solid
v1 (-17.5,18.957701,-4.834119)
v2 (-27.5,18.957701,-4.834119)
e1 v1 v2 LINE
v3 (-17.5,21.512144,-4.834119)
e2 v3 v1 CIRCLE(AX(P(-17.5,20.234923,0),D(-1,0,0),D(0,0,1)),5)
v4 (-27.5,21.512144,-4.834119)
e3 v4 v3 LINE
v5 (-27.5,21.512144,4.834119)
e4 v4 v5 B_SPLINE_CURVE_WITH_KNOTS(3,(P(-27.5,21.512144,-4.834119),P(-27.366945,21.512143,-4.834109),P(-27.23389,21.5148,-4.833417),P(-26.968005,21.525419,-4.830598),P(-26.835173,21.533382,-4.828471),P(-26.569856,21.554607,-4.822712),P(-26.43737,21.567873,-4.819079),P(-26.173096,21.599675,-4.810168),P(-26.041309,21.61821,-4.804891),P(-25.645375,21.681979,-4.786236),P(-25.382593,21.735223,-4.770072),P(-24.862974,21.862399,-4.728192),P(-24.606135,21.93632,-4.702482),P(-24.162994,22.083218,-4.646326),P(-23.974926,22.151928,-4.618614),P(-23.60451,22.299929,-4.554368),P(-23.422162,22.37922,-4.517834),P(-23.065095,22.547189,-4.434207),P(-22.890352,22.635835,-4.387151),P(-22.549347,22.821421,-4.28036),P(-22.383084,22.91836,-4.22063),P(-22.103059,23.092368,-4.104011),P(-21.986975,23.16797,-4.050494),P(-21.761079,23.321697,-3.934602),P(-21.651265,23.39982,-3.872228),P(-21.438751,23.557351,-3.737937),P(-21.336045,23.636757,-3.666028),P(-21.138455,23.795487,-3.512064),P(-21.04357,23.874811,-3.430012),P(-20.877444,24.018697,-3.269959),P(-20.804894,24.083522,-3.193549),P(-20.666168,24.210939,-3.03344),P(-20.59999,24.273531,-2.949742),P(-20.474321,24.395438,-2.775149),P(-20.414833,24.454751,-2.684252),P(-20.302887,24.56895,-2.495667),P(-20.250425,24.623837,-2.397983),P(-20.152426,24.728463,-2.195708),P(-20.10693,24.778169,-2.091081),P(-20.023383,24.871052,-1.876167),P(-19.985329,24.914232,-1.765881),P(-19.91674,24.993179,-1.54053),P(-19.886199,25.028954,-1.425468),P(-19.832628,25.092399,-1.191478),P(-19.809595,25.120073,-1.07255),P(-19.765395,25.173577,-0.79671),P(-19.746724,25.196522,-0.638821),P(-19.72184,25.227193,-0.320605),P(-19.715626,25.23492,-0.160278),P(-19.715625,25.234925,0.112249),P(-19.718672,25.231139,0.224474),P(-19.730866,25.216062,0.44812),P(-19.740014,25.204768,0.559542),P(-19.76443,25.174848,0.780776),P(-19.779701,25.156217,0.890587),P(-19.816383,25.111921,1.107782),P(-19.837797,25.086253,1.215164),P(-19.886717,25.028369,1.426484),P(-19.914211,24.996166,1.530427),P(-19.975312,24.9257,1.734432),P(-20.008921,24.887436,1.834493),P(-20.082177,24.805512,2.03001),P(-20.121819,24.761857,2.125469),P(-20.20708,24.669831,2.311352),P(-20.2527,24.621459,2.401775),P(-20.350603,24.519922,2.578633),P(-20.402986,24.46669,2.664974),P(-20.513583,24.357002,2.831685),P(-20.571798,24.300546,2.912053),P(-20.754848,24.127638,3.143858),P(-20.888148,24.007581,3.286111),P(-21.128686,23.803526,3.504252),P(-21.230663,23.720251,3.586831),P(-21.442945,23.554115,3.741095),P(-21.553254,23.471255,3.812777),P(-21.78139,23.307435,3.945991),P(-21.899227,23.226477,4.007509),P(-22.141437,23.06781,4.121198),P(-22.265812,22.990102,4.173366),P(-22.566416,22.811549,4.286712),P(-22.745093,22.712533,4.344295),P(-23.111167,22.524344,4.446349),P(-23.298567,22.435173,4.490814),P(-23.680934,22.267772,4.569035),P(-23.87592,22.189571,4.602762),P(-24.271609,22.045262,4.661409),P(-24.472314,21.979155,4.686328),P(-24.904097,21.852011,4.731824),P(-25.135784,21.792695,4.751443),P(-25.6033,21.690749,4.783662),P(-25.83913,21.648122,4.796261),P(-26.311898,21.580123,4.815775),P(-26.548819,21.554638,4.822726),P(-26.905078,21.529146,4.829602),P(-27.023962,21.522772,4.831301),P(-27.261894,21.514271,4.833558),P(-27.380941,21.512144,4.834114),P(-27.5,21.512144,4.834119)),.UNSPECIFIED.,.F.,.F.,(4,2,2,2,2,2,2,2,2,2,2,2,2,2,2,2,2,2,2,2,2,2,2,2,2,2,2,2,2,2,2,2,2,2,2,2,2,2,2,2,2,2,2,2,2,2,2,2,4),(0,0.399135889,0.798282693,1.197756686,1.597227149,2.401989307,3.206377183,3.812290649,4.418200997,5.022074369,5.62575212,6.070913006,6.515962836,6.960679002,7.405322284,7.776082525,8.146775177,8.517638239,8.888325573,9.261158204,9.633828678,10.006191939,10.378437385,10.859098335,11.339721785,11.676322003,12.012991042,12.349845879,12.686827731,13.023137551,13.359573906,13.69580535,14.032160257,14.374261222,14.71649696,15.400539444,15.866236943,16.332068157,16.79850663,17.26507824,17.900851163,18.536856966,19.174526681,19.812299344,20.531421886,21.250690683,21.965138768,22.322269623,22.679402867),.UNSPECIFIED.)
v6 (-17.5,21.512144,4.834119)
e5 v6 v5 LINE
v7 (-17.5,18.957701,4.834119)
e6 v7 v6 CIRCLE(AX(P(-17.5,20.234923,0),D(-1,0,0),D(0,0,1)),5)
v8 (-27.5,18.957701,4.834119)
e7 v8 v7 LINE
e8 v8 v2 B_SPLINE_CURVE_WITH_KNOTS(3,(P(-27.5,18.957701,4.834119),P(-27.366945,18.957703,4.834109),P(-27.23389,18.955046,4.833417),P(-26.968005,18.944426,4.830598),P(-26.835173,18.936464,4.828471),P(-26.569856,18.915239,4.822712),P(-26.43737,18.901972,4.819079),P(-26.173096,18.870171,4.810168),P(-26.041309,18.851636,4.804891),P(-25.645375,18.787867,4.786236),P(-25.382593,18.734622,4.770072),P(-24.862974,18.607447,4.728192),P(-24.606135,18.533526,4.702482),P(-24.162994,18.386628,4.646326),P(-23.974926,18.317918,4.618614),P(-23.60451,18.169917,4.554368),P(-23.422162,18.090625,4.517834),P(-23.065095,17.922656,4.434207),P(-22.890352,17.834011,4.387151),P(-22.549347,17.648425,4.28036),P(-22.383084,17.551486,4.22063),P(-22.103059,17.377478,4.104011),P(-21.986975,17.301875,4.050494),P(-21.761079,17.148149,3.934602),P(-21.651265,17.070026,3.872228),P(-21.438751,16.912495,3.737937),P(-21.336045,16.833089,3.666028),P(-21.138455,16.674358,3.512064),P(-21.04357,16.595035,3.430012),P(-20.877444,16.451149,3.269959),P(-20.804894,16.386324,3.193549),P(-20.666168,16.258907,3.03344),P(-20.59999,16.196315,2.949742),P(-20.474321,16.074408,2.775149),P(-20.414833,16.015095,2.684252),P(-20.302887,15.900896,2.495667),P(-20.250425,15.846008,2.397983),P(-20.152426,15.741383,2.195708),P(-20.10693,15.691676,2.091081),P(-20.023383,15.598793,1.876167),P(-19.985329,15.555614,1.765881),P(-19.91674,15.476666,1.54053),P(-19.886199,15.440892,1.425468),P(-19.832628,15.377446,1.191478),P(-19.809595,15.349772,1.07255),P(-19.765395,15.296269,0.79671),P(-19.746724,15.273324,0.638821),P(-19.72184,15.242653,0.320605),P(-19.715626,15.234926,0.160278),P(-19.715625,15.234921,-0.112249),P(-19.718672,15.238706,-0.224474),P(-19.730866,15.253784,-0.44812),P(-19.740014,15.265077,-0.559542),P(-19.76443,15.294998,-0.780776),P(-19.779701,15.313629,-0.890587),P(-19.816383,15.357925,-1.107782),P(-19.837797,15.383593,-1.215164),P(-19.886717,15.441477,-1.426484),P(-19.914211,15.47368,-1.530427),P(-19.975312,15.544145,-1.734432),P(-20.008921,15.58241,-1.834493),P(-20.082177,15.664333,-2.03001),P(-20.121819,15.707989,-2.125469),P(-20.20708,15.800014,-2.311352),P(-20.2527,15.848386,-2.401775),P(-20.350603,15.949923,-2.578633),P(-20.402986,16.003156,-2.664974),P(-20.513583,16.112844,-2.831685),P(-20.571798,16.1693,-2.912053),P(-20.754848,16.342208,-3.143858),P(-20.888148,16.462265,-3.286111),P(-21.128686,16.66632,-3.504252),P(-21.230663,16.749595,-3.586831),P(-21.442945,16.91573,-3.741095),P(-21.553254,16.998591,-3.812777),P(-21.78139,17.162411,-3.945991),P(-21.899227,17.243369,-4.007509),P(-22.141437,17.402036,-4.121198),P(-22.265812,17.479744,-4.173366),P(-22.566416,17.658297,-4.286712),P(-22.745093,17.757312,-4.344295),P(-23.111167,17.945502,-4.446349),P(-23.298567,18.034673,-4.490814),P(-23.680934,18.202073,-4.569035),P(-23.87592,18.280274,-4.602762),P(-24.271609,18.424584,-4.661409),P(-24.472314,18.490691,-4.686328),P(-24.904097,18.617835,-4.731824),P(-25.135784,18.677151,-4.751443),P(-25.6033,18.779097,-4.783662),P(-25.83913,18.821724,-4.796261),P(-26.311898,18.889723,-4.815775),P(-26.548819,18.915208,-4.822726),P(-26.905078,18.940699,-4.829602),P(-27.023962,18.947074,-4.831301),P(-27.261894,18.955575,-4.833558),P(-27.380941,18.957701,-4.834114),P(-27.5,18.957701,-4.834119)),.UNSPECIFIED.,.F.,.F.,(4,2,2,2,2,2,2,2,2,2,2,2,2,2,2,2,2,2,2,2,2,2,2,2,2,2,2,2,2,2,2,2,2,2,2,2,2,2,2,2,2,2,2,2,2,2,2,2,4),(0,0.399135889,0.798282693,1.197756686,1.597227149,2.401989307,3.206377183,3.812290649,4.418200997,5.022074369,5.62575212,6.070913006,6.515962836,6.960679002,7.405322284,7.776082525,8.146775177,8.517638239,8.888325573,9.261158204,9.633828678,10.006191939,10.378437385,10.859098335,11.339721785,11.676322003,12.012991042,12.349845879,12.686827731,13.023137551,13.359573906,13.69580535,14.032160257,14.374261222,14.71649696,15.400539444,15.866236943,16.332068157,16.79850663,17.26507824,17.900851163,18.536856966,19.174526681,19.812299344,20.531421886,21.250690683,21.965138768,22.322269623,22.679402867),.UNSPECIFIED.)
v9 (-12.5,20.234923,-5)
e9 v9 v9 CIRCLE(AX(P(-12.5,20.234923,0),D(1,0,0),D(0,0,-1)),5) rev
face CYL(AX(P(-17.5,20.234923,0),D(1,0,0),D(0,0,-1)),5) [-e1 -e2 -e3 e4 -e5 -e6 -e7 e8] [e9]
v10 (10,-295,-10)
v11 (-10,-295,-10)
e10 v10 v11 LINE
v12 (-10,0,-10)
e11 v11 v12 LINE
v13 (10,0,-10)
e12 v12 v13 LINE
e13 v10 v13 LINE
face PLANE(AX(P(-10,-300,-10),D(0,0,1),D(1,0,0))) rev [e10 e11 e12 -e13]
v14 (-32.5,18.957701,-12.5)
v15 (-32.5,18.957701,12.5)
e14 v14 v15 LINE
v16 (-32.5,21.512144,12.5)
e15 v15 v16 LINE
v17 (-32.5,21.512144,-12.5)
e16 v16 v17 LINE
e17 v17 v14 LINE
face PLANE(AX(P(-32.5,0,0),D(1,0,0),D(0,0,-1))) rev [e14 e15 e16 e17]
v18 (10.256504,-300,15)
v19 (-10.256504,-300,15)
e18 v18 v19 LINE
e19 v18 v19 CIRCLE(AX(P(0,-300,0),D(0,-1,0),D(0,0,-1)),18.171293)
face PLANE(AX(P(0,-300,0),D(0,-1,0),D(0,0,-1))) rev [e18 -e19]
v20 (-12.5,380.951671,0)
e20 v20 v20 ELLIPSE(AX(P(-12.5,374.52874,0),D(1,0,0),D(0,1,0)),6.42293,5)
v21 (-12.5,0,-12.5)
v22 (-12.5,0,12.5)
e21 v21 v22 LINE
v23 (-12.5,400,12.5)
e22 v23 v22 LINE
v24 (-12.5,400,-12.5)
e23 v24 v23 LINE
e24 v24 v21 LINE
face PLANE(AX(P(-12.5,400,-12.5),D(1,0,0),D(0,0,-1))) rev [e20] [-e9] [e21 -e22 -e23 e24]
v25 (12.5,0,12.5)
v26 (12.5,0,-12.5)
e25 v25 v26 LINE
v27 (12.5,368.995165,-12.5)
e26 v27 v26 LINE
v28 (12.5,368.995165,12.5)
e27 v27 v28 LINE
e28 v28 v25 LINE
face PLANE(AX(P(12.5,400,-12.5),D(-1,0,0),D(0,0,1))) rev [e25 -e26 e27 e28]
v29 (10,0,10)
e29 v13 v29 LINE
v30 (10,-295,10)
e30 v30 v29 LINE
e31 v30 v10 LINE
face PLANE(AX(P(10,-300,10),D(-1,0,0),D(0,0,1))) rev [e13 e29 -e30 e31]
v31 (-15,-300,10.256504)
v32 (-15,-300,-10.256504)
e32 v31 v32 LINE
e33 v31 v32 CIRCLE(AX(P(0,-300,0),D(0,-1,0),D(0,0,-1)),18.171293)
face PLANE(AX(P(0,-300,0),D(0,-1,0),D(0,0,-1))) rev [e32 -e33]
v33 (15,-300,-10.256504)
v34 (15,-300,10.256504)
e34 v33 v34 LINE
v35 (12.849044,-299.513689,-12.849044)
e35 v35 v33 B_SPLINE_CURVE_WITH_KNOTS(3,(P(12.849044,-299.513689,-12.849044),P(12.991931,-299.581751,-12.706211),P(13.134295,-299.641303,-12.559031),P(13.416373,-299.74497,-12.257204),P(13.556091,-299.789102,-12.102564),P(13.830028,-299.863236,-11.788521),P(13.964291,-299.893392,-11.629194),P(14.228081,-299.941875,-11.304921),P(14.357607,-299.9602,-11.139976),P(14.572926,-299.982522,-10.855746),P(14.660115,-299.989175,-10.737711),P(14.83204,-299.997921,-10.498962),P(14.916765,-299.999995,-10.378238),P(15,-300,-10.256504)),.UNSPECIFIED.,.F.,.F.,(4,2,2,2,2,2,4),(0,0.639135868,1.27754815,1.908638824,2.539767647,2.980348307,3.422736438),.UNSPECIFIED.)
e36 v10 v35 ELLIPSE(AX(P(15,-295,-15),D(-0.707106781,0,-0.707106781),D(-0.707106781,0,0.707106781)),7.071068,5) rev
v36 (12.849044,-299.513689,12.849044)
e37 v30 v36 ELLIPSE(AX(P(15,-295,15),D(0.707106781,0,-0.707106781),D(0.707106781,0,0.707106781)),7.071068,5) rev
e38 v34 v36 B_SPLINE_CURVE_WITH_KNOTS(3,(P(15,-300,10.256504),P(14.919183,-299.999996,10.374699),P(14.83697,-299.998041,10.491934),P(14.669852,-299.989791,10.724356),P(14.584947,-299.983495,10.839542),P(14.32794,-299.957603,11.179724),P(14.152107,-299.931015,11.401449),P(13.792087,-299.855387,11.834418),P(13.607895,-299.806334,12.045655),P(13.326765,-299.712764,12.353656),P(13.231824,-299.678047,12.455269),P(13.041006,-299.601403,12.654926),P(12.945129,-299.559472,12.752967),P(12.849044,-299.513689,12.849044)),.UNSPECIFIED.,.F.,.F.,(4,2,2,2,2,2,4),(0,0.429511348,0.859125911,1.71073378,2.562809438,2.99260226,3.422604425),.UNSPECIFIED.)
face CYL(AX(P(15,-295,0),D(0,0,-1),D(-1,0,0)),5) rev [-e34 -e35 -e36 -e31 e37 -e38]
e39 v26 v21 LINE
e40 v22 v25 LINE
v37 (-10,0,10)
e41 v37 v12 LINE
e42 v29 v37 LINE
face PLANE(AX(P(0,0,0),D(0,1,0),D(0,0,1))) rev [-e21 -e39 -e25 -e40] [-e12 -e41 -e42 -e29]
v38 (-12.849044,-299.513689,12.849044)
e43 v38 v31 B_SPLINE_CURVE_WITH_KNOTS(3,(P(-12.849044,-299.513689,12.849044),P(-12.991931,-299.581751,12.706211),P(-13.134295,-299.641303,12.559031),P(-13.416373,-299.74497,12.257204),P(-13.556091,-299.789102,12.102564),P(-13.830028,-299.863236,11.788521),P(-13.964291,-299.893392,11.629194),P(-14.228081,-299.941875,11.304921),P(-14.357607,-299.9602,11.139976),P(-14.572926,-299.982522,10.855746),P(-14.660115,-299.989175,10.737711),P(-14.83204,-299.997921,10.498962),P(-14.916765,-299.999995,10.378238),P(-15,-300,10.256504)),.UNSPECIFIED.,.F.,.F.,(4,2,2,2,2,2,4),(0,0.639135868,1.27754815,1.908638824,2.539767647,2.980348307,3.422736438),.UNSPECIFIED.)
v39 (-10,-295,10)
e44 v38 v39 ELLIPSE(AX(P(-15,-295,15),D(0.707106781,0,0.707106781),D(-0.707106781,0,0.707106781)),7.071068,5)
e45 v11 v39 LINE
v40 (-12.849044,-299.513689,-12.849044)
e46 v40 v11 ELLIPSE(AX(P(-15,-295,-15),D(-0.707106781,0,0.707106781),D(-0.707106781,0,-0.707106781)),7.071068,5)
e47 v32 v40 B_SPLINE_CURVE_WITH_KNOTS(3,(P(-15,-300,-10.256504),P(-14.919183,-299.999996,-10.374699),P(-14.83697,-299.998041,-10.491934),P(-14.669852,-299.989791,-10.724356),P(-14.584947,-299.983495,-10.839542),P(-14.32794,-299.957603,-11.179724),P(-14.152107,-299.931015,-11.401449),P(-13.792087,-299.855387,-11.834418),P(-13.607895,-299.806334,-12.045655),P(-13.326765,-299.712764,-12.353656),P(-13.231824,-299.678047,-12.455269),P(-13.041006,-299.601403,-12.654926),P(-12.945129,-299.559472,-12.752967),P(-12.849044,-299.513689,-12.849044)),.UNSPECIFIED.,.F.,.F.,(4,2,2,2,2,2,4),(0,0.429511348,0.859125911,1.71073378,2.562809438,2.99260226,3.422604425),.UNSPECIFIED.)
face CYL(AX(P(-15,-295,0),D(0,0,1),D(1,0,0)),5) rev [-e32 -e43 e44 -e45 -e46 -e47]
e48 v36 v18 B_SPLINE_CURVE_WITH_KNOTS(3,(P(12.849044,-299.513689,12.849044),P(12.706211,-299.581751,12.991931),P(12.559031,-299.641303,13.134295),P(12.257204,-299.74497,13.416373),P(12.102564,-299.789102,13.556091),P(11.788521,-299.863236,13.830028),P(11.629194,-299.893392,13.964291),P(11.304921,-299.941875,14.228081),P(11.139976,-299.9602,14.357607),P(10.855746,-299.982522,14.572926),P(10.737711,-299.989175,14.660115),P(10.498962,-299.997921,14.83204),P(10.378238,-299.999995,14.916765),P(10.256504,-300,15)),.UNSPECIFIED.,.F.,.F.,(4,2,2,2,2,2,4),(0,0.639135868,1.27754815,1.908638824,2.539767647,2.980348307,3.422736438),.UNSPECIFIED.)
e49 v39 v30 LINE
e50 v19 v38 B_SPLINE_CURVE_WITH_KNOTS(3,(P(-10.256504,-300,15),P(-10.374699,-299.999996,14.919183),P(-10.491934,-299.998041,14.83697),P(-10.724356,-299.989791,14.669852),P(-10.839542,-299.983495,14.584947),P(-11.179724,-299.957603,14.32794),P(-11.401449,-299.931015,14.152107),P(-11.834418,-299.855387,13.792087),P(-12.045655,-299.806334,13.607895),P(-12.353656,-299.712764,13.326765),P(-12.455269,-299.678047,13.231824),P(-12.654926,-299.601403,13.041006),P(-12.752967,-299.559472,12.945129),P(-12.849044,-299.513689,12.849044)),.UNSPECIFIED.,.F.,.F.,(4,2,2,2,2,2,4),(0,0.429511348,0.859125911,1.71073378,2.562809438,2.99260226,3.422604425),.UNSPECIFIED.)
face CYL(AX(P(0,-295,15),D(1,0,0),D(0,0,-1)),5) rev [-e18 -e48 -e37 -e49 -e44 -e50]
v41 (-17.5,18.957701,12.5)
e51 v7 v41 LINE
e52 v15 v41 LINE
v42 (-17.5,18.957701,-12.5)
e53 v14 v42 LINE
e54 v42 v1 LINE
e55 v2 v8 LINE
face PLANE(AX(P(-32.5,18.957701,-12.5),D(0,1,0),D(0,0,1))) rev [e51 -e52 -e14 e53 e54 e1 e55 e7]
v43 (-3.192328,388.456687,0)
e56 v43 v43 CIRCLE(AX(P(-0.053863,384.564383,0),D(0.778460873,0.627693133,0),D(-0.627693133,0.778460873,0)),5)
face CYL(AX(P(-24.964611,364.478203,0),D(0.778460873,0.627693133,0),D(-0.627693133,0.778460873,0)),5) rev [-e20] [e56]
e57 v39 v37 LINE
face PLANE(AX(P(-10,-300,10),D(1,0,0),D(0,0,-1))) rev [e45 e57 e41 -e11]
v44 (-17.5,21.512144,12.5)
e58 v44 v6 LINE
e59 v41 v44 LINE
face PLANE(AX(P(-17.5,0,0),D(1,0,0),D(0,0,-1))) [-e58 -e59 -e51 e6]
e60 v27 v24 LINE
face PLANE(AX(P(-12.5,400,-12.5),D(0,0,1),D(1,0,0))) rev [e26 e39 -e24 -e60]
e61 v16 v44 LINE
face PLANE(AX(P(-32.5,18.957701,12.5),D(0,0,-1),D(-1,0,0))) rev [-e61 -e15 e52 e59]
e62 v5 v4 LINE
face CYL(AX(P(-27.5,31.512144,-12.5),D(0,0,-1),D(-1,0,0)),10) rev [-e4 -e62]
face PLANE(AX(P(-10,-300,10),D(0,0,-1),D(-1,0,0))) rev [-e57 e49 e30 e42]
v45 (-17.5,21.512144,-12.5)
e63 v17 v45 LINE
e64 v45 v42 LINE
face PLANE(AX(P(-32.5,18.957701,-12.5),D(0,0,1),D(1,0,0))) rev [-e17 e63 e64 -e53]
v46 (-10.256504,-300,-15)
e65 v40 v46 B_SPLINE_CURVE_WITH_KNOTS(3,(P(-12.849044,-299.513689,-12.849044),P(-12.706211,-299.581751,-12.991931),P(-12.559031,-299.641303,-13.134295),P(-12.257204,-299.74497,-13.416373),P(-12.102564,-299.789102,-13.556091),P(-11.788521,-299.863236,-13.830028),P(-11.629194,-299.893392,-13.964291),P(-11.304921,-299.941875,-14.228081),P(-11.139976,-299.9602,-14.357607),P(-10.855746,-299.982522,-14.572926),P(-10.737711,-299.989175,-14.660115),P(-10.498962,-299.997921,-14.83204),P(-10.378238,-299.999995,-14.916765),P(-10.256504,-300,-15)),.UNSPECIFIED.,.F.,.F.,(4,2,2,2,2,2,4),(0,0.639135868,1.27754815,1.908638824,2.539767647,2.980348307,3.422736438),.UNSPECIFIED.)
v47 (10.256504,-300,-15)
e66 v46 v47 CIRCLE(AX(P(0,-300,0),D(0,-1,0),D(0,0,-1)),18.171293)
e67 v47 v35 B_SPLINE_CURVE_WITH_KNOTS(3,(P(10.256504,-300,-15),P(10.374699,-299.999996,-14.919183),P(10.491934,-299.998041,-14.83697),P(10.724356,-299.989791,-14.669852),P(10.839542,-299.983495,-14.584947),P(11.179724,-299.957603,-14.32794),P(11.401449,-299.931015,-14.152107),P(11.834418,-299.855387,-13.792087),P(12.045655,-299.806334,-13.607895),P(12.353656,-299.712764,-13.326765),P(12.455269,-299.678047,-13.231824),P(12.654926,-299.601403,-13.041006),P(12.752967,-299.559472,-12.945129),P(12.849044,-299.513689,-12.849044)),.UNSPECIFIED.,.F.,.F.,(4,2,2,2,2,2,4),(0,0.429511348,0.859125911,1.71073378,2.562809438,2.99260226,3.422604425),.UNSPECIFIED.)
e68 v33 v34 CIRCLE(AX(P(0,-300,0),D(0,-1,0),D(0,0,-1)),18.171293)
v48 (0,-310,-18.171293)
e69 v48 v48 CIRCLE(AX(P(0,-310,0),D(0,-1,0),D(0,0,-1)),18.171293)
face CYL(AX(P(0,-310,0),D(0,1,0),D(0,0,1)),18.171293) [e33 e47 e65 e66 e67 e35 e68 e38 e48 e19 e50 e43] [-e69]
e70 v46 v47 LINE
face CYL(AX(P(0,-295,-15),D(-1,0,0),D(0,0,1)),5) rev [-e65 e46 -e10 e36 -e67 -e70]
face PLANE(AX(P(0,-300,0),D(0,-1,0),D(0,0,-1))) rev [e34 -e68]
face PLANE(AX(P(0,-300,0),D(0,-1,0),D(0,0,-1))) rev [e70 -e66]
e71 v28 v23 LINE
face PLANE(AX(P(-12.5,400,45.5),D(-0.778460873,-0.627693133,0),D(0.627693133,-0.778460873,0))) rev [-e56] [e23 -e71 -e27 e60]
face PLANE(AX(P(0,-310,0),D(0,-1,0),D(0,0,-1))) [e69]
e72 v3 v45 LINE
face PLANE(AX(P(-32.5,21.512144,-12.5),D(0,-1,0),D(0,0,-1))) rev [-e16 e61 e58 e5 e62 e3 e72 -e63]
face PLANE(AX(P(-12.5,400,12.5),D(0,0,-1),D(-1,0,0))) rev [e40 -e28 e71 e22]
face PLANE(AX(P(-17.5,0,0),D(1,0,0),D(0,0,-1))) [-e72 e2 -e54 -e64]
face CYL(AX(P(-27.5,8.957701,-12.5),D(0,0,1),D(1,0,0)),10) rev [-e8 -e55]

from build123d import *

# Parameters (mm, degrees)
IZIM1_W                     = 25
IZIM1_H                     = 25
Y_KSEKLIK_EKSTR_ZYON1_DEPTH = 400
IZIM2_W                     = 20
IZIM2_H                     = 20
Y_KSEKLIK_EKSTR_ZYON2_DEPTH = 300
IZIM3_R                     = 5
Y_KSEKLIK_EKSTR_ZYON3_DEPTH = 5
IZIM4_W                     = 25
IZIM4_H                     = 2.554442859
Y_KSEKLIK_EKSTR_ZYON4_DEPTH = 15
RADYUS1_R                   = 10
IZIM6_R                     = 18.171292503
Y_KSEKLIK_EKSTR_ZYON5_DEPTH = 10
RADYUS2_R                   = 5
KES_EKSTR_ZYON2_DEPTH       = 58
IZIM8_R                     = 5
KES_EKSTR_ZYON3_DEPTH       = 32


with BuildPart() as part:
    # Çizim1 → Yükseklik-Ekstrüzyon1 (new body)
    with BuildSketch(Plane(origin=(0, 0, 0), x_dir=(1, 0, 0), z_dir=(0, 1, 0))):
        Rectangle(IZIM1_W, IZIM1_H)
    extrude(amount=Y_KSEKLIK_EKSTR_ZYON1_DEPTH)

    # Çizim2 → Yükseklik-Ekstrüzyon2 (add)
    with BuildSketch(Plane.XZ):
        Rectangle(IZIM2_W, IZIM2_H)
    extrude(amount=Y_KSEKLIK_EKSTR_ZYON2_DEPTH)

    # Çizim3 → Yükseklik-Ekstrüzyon3 (add)
    with BuildSketch(Plane.ZY.offset(12.5)):
        with Locations(Location((0, 20.234922869, 0), (0, 0, 180))):
            Circle(IZIM3_R)
    extrude(amount=Y_KSEKLIK_EKSTR_ZYON3_DEPTH)

    # Çizim4 → Yükseklik-Ekstrüzyon4 (add)
    with BuildSketch(Plane.ZY.offset(17.5)):
        with Locations((0, 20.23492287)):
            Rectangle(IZIM4_W, IZIM4_H)
    extrude(amount=Y_KSEKLIK_EKSTR_ZYON4_DEPTH)

    # Radyus1
    # the kernel refuses this fillet: 10 mm, written as the material it adds along each edge
    with BuildSketch(Plane(origin=(-17.5, 18.95770144, -29.834118888), x_dir=(0, -1, 0), z_dir=(0, 0, 1))) as radyus1_piece_1_section:
        with BuildLine():
            CenterArc((RADYUS1_R, -RADYUS1_R), RADYUS1_R, 90, 90)
            Line((0, -RADYUS1_R), (0, 0))
            Line((0, 0), (RADYUS1_R, 0))
        make_face()
    radyus1_piece_1 = extrude(amount=59.668237775, mode=Mode.PRIVATE)
    radyus1_piece_1 = radyus1_piece_1 & Plane(origin=(-20.338214919, 20.234922869, 0), x_dir=(0, 0, -1), z_dir=(1, 0, 0)) * Cylinder(5, 160, mode=Mode.PRIVATE)
    add(radyus1_piece_1)
    with BuildSketch(Plane(origin=(-17.5, 21.512144299, 29.834118888), x_dir=(0, 1, 0), z_dir=(0, 0, -1))) as radyus1_piece_2_section:
        with BuildLine():
            CenterArc((RADYUS1_R, -RADYUS1_R), RADYUS1_R, 90, 90)
            Line((0, -RADYUS1_R), (0, 0))
            Line((0, 0), (RADYUS1_R, 0))
        make_face()
    radyus1_piece_2 = extrude(amount=59.668237775, mode=Mode.PRIVATE)
    radyus1_piece_2 = radyus1_piece_2 & Plane(origin=(-20.33821492, 20.234922869, 0), x_dir=(0, 0, -1), z_dir=(1, 0, 0)) * Cylinder(5, 160, mode=Mode.PRIVATE)
    add(radyus1_piece_2)

    # Çizim6 → Yükseklik-Ekstrüzyon5 (add)
    with BuildSketch(Plane.XZ.offset(300)):
        with Locations(Location((0, 0, 0), (0, 0, 270))):
            Circle(IZIM6_R)
    extrude(amount=Y_KSEKLIK_EKSTR_ZYON5_DEPTH)

    # Radyus2
    # the kernel refuses this fillet: 5 mm, written as the material it adds along each edge
    with BuildSketch(Plane(origin=(10, -300, 10), x_dir=(1, 0, 0), z_dir=(0, 0, -1)), Plane(origin=(-10, -300, 10), x_dir=(0, 0, 1), z_dir=(1, 0, 0)), Plane(origin=(-10, -300, -10), x_dir=(-1, 0, 0), z_dir=(0, 0, 1)), Plane(origin=(10, -300, -10), x_dir=(0, 0, -1), z_dir=(-1, 0, 0))) as radyus2_piece_1:
        with BuildLine():
            CenterArc((RADYUS2_R, -RADYUS2_R), RADYUS2_R, 90, 90)
            Line((0, -RADYUS2_R), (0, 0))
            Line((0, 0), (RADYUS2_R, 0))
        make_face()
    extrude(amount=20)
    with BuildSketch(Plane(origin=(10, -300, 22.5), x_dir=(1, 0, 0), z_dir=(0, 0, -1))) as radyus2_piece_2a_section:
        with BuildLine():
            CenterArc((RADYUS2_R, -RADYUS2_R), RADYUS2_R, 90, 90)
            Line((0, -RADYUS2_R), (0, 0))
            Line((0, 0), (RADYUS2_R, 0))
        make_face()
    radyus2_piece_2a = extrude(amount=32.5, mode=Mode.PRIVATE)
    radyus2_piece_2a = radyus2_piece_2a & Plane(origin=(0, -298.735965494, 0), x_dir=(0, 0, -1), z_dir=(0, 1, 0)) * Cylinder(18.171292503, 85, mode=Mode.PRIVATE)
    radyus2_piece_2a = split(radyus2_piece_2a, bisect_by=Plane(origin=(10.899012229, -298.735965494, 10), z_dir=(0, 0, 1)), keep=Keep.TOP, mode=Mode.PRIVATE)
    with BuildSketch(Plane(origin=(-10, -300, 10), x_dir=(0, 0, 1), z_dir=(1, 0, 0))) as radyus2_piece_2b_section:
        with BuildLine():
            CenterArc((RADYUS2_R, -RADYUS2_R), RADYUS2_R, 90, 90)
            Line((0, -RADYUS2_R), (0, 0))
            Line((0, 0), (RADYUS2_R, 0))
        make_face()
    radyus2_piece_2b = extrude(amount=32.5, mode=Mode.PRIVATE)
    radyus2_piece_2b = radyus2_piece_2b & Plane(origin=(0, -298.73596552, 0), x_dir=(0, 0, -1), z_dir=(0, 1, 0)) * Cylinder(18.171292503, 85, mode=Mode.PRIVATE)
    radyus2_piece_2b = split(radyus2_piece_2b, bisect_by=Plane(origin=(10, -298.73596552, 10.899011766), z_dir=(1, 0, 0)), keep=Keep.TOP, mode=Mode.PRIVATE)
    radyus2_piece_2 = radyus2_piece_2a & radyus2_piece_2b
    add(radyus2_piece_2)
    with BuildSketch(Plane(origin=(22.5, -300, -10), x_dir=(0, 0, -1), z_dir=(-1, 0, 0))) as radyus2_piece_3a_section:
        with BuildLine():
            CenterArc((RADYUS2_R, -RADYUS2_R), RADYUS2_R, 90, 90)
            Line((0, -RADYUS2_R), (0, 0))
            Line((0, 0), (RADYUS2_R, 0))
        make_face()
    radyus2_piece_3a = extrude(amount=32.5, mode=Mode.PRIVATE)
    radyus2_piece_3a = radyus2_piece_3a & Plane(origin=(0, -298.735965494, 0), x_dir=(0, 0, -1), z_dir=(0, 1, 0)) * Cylinder(18.171292503, 85, mode=Mode.PRIVATE)
    radyus2_piece_3a = split(radyus2_piece_3a, bisect_by=Plane(origin=(10, -298.735965494, -10.899012229), z_dir=(1, 0, 0)), keep=Keep.TOP, mode=Mode.PRIVATE)
    with BuildSketch(Plane(origin=(10, -300, 10), x_dir=(1, 0, 0), z_dir=(0, 0, -1))) as radyus2_piece_3b_section:
        with BuildLine():
            CenterArc((RADYUS2_R, -RADYUS2_R), RADYUS2_R, 90, 90)
            Line((0, -RADYUS2_R), (0, 0))
            Line((0, 0), (RADYUS2_R, 0))
        make_face()
    radyus2_piece_3b = extrude(amount=32.5, mode=Mode.PRIVATE)
    radyus2_piece_3b = radyus2_piece_3b & Plane(origin=(0, -298.73596552, 0), x_dir=(0, 0, -1), z_dir=(0, 1, 0)) * Cylinder(18.171292503, 85, mode=Mode.PRIVATE)
    radyus2_piece_3b = split(radyus2_piece_3b, bisect_by=Plane(origin=(10.899011766, -298.73596552, -10), z_dir=(0, 0, -1)), keep=Keep.TOP, mode=Mode.PRIVATE)
    radyus2_piece_3 = radyus2_piece_3a & radyus2_piece_3b
    add(radyus2_piece_3)
    with BuildSketch(Plane(origin=(-22.5, -300, 10), x_dir=(0, 0, 1), z_dir=(1, 0, 0))) as radyus2_piece_4a_section:
        with BuildLine():
            CenterArc((RADYUS2_R, -RADYUS2_R), RADYUS2_R, 90, 90)
            Line((0, -RADYUS2_R), (0, 0))
            Line((0, 0), (RADYUS2_R, 0))
        make_face()
    radyus2_piece_4a = extrude(amount=32.5, mode=Mode.PRIVATE)
    radyus2_piece_4a = radyus2_piece_4a & Plane(origin=(0, -298.735965494, 0), x_dir=(0, 0, -1), z_dir=(0, 1, 0)) * Cylinder(18.171292503, 85, mode=Mode.PRIVATE)
    radyus2_piece_4a = split(radyus2_piece_4a, bisect_by=Plane(origin=(-10, -298.735965494, 10.899012229), z_dir=(-1, 0, 0)), keep=Keep.TOP, mode=Mode.PRIVATE)
    with BuildSketch(Plane(origin=(-10, -300, -10), x_dir=(-1, 0, 0), z_dir=(0, 0, 1))) as radyus2_piece_4b_section:
        with BuildLine():
            CenterArc((RADYUS2_R, -RADYUS2_R), RADYUS2_R, 90, 90)
            Line((0, -RADYUS2_R), (0, 0))
            Line((0, 0), (RADYUS2_R, 0))
        make_face()
    radyus2_piece_4b = extrude(amount=32.5, mode=Mode.PRIVATE)
    radyus2_piece_4b = radyus2_piece_4b & Plane(origin=(0, -298.73596552, 0), x_dir=(0, 0, -1), z_dir=(0, 1, 0)) * Cylinder(18.171292503, 85, mode=Mode.PRIVATE)
    radyus2_piece_4b = split(radyus2_piece_4b, bisect_by=Plane(origin=(-10.899011766, -298.73596552, 10), z_dir=(0, 0, 1)), keep=Keep.TOP, mode=Mode.PRIVATE)
    radyus2_piece_4 = radyus2_piece_4a & radyus2_piece_4b
    add(radyus2_piece_4)
    with BuildSketch(Plane(origin=(10, -300, -10), x_dir=(0, 0, -1), z_dir=(-1, 0, 0))) as radyus2_piece_5a_section:
        with BuildLine():
            CenterArc((RADYUS2_R, -RADYUS2_R), RADYUS2_R, 90, 90)
            Line((0, -RADYUS2_R), (0, 0))
            Line((0, 0), (RADYUS2_R, 0))
        make_face()
    radyus2_piece_5a = extrude(amount=32.5, mode=Mode.PRIVATE)
    radyus2_piece_5a = radyus2_piece_5a & Plane(origin=(0, -298.73596552, 0), x_dir=(0, 0, -1), z_dir=(0, 1, 0)) * Cylinder(18.171292503, 86, mode=Mode.PRIVATE)
    radyus2_piece_5a = split(radyus2_piece_5a, bisect_by=Plane(origin=(-10, -298.73596552, -10.899011766), z_dir=(-1, 0, 0)), keep=Keep.TOP, mode=Mode.PRIVATE)
    with BuildSketch(Plane(origin=(-10, -300, -22.5), x_dir=(-1, 0, 0), z_dir=(0, 0, 1))) as radyus2_piece_5b_section:
        with BuildLine():
            CenterArc((RADYUS2_R, -RADYUS2_R), RADYUS2_R, 90, 90)
            Line((0, -RADYUS2_R), (0, 0))
            Line((0, 0), (RADYUS2_R, 0))
        make_face()
    radyus2_piece_5b = extrude(amount=32.5, mode=Mode.PRIVATE)
    radyus2_piece_5b = radyus2_piece_5b & Plane(origin=(0, -298.735965494, 0), x_dir=(0, 0, -1), z_dir=(0, 1, 0)) * Cylinder(18.171292503, 85, mode=Mode.PRIVATE)
    radyus2_piece_5b = split(radyus2_piece_5b, bisect_by=Plane(origin=(-10.899012229, -298.735965494, -10), z_dir=(0, 0, -1)), keep=Keep.TOP, mode=Mode.PRIVATE)
    radyus2_piece_5 = radyus2_piece_5a & radyus2_piece_5b
    add(radyus2_piece_5)

    # Çizim7 → Kes-Ekstrüzyon2 (cut)
    with BuildSketch(Plane(origin=(0, 0, -12.5), x_dir=(-1, 0, 0), z_dir=(0, 0, -1))):
        Polygon((12.5, 400), (-29.263602087, 348.205056807), (-29.263602087, 417.124411345), (12.5, 417.124411345), align=None)
    extrude(amount=-KES_EKSTR_ZYON2_DEPTH, mode=Mode.SUBTRACT)

    # Çizim8 → Kes-Ekstrüzyon3 (cut)
    with BuildSketch(Plane(origin=(187.878801042, 151.491535729, 0), x_dir=(0, 0, -1), z_dir=(0.7784608732437974, 0.6276931326918469, 0))):
        with Locations(Location((0, 299.402134432, 0), (0, 0, 90))):
            Circle(IZIM8_R)
    extrude(amount=-KES_EKSTR_ZYON3_DEPTH, mode=Mode.SUBTRACT)


solid = part.part
